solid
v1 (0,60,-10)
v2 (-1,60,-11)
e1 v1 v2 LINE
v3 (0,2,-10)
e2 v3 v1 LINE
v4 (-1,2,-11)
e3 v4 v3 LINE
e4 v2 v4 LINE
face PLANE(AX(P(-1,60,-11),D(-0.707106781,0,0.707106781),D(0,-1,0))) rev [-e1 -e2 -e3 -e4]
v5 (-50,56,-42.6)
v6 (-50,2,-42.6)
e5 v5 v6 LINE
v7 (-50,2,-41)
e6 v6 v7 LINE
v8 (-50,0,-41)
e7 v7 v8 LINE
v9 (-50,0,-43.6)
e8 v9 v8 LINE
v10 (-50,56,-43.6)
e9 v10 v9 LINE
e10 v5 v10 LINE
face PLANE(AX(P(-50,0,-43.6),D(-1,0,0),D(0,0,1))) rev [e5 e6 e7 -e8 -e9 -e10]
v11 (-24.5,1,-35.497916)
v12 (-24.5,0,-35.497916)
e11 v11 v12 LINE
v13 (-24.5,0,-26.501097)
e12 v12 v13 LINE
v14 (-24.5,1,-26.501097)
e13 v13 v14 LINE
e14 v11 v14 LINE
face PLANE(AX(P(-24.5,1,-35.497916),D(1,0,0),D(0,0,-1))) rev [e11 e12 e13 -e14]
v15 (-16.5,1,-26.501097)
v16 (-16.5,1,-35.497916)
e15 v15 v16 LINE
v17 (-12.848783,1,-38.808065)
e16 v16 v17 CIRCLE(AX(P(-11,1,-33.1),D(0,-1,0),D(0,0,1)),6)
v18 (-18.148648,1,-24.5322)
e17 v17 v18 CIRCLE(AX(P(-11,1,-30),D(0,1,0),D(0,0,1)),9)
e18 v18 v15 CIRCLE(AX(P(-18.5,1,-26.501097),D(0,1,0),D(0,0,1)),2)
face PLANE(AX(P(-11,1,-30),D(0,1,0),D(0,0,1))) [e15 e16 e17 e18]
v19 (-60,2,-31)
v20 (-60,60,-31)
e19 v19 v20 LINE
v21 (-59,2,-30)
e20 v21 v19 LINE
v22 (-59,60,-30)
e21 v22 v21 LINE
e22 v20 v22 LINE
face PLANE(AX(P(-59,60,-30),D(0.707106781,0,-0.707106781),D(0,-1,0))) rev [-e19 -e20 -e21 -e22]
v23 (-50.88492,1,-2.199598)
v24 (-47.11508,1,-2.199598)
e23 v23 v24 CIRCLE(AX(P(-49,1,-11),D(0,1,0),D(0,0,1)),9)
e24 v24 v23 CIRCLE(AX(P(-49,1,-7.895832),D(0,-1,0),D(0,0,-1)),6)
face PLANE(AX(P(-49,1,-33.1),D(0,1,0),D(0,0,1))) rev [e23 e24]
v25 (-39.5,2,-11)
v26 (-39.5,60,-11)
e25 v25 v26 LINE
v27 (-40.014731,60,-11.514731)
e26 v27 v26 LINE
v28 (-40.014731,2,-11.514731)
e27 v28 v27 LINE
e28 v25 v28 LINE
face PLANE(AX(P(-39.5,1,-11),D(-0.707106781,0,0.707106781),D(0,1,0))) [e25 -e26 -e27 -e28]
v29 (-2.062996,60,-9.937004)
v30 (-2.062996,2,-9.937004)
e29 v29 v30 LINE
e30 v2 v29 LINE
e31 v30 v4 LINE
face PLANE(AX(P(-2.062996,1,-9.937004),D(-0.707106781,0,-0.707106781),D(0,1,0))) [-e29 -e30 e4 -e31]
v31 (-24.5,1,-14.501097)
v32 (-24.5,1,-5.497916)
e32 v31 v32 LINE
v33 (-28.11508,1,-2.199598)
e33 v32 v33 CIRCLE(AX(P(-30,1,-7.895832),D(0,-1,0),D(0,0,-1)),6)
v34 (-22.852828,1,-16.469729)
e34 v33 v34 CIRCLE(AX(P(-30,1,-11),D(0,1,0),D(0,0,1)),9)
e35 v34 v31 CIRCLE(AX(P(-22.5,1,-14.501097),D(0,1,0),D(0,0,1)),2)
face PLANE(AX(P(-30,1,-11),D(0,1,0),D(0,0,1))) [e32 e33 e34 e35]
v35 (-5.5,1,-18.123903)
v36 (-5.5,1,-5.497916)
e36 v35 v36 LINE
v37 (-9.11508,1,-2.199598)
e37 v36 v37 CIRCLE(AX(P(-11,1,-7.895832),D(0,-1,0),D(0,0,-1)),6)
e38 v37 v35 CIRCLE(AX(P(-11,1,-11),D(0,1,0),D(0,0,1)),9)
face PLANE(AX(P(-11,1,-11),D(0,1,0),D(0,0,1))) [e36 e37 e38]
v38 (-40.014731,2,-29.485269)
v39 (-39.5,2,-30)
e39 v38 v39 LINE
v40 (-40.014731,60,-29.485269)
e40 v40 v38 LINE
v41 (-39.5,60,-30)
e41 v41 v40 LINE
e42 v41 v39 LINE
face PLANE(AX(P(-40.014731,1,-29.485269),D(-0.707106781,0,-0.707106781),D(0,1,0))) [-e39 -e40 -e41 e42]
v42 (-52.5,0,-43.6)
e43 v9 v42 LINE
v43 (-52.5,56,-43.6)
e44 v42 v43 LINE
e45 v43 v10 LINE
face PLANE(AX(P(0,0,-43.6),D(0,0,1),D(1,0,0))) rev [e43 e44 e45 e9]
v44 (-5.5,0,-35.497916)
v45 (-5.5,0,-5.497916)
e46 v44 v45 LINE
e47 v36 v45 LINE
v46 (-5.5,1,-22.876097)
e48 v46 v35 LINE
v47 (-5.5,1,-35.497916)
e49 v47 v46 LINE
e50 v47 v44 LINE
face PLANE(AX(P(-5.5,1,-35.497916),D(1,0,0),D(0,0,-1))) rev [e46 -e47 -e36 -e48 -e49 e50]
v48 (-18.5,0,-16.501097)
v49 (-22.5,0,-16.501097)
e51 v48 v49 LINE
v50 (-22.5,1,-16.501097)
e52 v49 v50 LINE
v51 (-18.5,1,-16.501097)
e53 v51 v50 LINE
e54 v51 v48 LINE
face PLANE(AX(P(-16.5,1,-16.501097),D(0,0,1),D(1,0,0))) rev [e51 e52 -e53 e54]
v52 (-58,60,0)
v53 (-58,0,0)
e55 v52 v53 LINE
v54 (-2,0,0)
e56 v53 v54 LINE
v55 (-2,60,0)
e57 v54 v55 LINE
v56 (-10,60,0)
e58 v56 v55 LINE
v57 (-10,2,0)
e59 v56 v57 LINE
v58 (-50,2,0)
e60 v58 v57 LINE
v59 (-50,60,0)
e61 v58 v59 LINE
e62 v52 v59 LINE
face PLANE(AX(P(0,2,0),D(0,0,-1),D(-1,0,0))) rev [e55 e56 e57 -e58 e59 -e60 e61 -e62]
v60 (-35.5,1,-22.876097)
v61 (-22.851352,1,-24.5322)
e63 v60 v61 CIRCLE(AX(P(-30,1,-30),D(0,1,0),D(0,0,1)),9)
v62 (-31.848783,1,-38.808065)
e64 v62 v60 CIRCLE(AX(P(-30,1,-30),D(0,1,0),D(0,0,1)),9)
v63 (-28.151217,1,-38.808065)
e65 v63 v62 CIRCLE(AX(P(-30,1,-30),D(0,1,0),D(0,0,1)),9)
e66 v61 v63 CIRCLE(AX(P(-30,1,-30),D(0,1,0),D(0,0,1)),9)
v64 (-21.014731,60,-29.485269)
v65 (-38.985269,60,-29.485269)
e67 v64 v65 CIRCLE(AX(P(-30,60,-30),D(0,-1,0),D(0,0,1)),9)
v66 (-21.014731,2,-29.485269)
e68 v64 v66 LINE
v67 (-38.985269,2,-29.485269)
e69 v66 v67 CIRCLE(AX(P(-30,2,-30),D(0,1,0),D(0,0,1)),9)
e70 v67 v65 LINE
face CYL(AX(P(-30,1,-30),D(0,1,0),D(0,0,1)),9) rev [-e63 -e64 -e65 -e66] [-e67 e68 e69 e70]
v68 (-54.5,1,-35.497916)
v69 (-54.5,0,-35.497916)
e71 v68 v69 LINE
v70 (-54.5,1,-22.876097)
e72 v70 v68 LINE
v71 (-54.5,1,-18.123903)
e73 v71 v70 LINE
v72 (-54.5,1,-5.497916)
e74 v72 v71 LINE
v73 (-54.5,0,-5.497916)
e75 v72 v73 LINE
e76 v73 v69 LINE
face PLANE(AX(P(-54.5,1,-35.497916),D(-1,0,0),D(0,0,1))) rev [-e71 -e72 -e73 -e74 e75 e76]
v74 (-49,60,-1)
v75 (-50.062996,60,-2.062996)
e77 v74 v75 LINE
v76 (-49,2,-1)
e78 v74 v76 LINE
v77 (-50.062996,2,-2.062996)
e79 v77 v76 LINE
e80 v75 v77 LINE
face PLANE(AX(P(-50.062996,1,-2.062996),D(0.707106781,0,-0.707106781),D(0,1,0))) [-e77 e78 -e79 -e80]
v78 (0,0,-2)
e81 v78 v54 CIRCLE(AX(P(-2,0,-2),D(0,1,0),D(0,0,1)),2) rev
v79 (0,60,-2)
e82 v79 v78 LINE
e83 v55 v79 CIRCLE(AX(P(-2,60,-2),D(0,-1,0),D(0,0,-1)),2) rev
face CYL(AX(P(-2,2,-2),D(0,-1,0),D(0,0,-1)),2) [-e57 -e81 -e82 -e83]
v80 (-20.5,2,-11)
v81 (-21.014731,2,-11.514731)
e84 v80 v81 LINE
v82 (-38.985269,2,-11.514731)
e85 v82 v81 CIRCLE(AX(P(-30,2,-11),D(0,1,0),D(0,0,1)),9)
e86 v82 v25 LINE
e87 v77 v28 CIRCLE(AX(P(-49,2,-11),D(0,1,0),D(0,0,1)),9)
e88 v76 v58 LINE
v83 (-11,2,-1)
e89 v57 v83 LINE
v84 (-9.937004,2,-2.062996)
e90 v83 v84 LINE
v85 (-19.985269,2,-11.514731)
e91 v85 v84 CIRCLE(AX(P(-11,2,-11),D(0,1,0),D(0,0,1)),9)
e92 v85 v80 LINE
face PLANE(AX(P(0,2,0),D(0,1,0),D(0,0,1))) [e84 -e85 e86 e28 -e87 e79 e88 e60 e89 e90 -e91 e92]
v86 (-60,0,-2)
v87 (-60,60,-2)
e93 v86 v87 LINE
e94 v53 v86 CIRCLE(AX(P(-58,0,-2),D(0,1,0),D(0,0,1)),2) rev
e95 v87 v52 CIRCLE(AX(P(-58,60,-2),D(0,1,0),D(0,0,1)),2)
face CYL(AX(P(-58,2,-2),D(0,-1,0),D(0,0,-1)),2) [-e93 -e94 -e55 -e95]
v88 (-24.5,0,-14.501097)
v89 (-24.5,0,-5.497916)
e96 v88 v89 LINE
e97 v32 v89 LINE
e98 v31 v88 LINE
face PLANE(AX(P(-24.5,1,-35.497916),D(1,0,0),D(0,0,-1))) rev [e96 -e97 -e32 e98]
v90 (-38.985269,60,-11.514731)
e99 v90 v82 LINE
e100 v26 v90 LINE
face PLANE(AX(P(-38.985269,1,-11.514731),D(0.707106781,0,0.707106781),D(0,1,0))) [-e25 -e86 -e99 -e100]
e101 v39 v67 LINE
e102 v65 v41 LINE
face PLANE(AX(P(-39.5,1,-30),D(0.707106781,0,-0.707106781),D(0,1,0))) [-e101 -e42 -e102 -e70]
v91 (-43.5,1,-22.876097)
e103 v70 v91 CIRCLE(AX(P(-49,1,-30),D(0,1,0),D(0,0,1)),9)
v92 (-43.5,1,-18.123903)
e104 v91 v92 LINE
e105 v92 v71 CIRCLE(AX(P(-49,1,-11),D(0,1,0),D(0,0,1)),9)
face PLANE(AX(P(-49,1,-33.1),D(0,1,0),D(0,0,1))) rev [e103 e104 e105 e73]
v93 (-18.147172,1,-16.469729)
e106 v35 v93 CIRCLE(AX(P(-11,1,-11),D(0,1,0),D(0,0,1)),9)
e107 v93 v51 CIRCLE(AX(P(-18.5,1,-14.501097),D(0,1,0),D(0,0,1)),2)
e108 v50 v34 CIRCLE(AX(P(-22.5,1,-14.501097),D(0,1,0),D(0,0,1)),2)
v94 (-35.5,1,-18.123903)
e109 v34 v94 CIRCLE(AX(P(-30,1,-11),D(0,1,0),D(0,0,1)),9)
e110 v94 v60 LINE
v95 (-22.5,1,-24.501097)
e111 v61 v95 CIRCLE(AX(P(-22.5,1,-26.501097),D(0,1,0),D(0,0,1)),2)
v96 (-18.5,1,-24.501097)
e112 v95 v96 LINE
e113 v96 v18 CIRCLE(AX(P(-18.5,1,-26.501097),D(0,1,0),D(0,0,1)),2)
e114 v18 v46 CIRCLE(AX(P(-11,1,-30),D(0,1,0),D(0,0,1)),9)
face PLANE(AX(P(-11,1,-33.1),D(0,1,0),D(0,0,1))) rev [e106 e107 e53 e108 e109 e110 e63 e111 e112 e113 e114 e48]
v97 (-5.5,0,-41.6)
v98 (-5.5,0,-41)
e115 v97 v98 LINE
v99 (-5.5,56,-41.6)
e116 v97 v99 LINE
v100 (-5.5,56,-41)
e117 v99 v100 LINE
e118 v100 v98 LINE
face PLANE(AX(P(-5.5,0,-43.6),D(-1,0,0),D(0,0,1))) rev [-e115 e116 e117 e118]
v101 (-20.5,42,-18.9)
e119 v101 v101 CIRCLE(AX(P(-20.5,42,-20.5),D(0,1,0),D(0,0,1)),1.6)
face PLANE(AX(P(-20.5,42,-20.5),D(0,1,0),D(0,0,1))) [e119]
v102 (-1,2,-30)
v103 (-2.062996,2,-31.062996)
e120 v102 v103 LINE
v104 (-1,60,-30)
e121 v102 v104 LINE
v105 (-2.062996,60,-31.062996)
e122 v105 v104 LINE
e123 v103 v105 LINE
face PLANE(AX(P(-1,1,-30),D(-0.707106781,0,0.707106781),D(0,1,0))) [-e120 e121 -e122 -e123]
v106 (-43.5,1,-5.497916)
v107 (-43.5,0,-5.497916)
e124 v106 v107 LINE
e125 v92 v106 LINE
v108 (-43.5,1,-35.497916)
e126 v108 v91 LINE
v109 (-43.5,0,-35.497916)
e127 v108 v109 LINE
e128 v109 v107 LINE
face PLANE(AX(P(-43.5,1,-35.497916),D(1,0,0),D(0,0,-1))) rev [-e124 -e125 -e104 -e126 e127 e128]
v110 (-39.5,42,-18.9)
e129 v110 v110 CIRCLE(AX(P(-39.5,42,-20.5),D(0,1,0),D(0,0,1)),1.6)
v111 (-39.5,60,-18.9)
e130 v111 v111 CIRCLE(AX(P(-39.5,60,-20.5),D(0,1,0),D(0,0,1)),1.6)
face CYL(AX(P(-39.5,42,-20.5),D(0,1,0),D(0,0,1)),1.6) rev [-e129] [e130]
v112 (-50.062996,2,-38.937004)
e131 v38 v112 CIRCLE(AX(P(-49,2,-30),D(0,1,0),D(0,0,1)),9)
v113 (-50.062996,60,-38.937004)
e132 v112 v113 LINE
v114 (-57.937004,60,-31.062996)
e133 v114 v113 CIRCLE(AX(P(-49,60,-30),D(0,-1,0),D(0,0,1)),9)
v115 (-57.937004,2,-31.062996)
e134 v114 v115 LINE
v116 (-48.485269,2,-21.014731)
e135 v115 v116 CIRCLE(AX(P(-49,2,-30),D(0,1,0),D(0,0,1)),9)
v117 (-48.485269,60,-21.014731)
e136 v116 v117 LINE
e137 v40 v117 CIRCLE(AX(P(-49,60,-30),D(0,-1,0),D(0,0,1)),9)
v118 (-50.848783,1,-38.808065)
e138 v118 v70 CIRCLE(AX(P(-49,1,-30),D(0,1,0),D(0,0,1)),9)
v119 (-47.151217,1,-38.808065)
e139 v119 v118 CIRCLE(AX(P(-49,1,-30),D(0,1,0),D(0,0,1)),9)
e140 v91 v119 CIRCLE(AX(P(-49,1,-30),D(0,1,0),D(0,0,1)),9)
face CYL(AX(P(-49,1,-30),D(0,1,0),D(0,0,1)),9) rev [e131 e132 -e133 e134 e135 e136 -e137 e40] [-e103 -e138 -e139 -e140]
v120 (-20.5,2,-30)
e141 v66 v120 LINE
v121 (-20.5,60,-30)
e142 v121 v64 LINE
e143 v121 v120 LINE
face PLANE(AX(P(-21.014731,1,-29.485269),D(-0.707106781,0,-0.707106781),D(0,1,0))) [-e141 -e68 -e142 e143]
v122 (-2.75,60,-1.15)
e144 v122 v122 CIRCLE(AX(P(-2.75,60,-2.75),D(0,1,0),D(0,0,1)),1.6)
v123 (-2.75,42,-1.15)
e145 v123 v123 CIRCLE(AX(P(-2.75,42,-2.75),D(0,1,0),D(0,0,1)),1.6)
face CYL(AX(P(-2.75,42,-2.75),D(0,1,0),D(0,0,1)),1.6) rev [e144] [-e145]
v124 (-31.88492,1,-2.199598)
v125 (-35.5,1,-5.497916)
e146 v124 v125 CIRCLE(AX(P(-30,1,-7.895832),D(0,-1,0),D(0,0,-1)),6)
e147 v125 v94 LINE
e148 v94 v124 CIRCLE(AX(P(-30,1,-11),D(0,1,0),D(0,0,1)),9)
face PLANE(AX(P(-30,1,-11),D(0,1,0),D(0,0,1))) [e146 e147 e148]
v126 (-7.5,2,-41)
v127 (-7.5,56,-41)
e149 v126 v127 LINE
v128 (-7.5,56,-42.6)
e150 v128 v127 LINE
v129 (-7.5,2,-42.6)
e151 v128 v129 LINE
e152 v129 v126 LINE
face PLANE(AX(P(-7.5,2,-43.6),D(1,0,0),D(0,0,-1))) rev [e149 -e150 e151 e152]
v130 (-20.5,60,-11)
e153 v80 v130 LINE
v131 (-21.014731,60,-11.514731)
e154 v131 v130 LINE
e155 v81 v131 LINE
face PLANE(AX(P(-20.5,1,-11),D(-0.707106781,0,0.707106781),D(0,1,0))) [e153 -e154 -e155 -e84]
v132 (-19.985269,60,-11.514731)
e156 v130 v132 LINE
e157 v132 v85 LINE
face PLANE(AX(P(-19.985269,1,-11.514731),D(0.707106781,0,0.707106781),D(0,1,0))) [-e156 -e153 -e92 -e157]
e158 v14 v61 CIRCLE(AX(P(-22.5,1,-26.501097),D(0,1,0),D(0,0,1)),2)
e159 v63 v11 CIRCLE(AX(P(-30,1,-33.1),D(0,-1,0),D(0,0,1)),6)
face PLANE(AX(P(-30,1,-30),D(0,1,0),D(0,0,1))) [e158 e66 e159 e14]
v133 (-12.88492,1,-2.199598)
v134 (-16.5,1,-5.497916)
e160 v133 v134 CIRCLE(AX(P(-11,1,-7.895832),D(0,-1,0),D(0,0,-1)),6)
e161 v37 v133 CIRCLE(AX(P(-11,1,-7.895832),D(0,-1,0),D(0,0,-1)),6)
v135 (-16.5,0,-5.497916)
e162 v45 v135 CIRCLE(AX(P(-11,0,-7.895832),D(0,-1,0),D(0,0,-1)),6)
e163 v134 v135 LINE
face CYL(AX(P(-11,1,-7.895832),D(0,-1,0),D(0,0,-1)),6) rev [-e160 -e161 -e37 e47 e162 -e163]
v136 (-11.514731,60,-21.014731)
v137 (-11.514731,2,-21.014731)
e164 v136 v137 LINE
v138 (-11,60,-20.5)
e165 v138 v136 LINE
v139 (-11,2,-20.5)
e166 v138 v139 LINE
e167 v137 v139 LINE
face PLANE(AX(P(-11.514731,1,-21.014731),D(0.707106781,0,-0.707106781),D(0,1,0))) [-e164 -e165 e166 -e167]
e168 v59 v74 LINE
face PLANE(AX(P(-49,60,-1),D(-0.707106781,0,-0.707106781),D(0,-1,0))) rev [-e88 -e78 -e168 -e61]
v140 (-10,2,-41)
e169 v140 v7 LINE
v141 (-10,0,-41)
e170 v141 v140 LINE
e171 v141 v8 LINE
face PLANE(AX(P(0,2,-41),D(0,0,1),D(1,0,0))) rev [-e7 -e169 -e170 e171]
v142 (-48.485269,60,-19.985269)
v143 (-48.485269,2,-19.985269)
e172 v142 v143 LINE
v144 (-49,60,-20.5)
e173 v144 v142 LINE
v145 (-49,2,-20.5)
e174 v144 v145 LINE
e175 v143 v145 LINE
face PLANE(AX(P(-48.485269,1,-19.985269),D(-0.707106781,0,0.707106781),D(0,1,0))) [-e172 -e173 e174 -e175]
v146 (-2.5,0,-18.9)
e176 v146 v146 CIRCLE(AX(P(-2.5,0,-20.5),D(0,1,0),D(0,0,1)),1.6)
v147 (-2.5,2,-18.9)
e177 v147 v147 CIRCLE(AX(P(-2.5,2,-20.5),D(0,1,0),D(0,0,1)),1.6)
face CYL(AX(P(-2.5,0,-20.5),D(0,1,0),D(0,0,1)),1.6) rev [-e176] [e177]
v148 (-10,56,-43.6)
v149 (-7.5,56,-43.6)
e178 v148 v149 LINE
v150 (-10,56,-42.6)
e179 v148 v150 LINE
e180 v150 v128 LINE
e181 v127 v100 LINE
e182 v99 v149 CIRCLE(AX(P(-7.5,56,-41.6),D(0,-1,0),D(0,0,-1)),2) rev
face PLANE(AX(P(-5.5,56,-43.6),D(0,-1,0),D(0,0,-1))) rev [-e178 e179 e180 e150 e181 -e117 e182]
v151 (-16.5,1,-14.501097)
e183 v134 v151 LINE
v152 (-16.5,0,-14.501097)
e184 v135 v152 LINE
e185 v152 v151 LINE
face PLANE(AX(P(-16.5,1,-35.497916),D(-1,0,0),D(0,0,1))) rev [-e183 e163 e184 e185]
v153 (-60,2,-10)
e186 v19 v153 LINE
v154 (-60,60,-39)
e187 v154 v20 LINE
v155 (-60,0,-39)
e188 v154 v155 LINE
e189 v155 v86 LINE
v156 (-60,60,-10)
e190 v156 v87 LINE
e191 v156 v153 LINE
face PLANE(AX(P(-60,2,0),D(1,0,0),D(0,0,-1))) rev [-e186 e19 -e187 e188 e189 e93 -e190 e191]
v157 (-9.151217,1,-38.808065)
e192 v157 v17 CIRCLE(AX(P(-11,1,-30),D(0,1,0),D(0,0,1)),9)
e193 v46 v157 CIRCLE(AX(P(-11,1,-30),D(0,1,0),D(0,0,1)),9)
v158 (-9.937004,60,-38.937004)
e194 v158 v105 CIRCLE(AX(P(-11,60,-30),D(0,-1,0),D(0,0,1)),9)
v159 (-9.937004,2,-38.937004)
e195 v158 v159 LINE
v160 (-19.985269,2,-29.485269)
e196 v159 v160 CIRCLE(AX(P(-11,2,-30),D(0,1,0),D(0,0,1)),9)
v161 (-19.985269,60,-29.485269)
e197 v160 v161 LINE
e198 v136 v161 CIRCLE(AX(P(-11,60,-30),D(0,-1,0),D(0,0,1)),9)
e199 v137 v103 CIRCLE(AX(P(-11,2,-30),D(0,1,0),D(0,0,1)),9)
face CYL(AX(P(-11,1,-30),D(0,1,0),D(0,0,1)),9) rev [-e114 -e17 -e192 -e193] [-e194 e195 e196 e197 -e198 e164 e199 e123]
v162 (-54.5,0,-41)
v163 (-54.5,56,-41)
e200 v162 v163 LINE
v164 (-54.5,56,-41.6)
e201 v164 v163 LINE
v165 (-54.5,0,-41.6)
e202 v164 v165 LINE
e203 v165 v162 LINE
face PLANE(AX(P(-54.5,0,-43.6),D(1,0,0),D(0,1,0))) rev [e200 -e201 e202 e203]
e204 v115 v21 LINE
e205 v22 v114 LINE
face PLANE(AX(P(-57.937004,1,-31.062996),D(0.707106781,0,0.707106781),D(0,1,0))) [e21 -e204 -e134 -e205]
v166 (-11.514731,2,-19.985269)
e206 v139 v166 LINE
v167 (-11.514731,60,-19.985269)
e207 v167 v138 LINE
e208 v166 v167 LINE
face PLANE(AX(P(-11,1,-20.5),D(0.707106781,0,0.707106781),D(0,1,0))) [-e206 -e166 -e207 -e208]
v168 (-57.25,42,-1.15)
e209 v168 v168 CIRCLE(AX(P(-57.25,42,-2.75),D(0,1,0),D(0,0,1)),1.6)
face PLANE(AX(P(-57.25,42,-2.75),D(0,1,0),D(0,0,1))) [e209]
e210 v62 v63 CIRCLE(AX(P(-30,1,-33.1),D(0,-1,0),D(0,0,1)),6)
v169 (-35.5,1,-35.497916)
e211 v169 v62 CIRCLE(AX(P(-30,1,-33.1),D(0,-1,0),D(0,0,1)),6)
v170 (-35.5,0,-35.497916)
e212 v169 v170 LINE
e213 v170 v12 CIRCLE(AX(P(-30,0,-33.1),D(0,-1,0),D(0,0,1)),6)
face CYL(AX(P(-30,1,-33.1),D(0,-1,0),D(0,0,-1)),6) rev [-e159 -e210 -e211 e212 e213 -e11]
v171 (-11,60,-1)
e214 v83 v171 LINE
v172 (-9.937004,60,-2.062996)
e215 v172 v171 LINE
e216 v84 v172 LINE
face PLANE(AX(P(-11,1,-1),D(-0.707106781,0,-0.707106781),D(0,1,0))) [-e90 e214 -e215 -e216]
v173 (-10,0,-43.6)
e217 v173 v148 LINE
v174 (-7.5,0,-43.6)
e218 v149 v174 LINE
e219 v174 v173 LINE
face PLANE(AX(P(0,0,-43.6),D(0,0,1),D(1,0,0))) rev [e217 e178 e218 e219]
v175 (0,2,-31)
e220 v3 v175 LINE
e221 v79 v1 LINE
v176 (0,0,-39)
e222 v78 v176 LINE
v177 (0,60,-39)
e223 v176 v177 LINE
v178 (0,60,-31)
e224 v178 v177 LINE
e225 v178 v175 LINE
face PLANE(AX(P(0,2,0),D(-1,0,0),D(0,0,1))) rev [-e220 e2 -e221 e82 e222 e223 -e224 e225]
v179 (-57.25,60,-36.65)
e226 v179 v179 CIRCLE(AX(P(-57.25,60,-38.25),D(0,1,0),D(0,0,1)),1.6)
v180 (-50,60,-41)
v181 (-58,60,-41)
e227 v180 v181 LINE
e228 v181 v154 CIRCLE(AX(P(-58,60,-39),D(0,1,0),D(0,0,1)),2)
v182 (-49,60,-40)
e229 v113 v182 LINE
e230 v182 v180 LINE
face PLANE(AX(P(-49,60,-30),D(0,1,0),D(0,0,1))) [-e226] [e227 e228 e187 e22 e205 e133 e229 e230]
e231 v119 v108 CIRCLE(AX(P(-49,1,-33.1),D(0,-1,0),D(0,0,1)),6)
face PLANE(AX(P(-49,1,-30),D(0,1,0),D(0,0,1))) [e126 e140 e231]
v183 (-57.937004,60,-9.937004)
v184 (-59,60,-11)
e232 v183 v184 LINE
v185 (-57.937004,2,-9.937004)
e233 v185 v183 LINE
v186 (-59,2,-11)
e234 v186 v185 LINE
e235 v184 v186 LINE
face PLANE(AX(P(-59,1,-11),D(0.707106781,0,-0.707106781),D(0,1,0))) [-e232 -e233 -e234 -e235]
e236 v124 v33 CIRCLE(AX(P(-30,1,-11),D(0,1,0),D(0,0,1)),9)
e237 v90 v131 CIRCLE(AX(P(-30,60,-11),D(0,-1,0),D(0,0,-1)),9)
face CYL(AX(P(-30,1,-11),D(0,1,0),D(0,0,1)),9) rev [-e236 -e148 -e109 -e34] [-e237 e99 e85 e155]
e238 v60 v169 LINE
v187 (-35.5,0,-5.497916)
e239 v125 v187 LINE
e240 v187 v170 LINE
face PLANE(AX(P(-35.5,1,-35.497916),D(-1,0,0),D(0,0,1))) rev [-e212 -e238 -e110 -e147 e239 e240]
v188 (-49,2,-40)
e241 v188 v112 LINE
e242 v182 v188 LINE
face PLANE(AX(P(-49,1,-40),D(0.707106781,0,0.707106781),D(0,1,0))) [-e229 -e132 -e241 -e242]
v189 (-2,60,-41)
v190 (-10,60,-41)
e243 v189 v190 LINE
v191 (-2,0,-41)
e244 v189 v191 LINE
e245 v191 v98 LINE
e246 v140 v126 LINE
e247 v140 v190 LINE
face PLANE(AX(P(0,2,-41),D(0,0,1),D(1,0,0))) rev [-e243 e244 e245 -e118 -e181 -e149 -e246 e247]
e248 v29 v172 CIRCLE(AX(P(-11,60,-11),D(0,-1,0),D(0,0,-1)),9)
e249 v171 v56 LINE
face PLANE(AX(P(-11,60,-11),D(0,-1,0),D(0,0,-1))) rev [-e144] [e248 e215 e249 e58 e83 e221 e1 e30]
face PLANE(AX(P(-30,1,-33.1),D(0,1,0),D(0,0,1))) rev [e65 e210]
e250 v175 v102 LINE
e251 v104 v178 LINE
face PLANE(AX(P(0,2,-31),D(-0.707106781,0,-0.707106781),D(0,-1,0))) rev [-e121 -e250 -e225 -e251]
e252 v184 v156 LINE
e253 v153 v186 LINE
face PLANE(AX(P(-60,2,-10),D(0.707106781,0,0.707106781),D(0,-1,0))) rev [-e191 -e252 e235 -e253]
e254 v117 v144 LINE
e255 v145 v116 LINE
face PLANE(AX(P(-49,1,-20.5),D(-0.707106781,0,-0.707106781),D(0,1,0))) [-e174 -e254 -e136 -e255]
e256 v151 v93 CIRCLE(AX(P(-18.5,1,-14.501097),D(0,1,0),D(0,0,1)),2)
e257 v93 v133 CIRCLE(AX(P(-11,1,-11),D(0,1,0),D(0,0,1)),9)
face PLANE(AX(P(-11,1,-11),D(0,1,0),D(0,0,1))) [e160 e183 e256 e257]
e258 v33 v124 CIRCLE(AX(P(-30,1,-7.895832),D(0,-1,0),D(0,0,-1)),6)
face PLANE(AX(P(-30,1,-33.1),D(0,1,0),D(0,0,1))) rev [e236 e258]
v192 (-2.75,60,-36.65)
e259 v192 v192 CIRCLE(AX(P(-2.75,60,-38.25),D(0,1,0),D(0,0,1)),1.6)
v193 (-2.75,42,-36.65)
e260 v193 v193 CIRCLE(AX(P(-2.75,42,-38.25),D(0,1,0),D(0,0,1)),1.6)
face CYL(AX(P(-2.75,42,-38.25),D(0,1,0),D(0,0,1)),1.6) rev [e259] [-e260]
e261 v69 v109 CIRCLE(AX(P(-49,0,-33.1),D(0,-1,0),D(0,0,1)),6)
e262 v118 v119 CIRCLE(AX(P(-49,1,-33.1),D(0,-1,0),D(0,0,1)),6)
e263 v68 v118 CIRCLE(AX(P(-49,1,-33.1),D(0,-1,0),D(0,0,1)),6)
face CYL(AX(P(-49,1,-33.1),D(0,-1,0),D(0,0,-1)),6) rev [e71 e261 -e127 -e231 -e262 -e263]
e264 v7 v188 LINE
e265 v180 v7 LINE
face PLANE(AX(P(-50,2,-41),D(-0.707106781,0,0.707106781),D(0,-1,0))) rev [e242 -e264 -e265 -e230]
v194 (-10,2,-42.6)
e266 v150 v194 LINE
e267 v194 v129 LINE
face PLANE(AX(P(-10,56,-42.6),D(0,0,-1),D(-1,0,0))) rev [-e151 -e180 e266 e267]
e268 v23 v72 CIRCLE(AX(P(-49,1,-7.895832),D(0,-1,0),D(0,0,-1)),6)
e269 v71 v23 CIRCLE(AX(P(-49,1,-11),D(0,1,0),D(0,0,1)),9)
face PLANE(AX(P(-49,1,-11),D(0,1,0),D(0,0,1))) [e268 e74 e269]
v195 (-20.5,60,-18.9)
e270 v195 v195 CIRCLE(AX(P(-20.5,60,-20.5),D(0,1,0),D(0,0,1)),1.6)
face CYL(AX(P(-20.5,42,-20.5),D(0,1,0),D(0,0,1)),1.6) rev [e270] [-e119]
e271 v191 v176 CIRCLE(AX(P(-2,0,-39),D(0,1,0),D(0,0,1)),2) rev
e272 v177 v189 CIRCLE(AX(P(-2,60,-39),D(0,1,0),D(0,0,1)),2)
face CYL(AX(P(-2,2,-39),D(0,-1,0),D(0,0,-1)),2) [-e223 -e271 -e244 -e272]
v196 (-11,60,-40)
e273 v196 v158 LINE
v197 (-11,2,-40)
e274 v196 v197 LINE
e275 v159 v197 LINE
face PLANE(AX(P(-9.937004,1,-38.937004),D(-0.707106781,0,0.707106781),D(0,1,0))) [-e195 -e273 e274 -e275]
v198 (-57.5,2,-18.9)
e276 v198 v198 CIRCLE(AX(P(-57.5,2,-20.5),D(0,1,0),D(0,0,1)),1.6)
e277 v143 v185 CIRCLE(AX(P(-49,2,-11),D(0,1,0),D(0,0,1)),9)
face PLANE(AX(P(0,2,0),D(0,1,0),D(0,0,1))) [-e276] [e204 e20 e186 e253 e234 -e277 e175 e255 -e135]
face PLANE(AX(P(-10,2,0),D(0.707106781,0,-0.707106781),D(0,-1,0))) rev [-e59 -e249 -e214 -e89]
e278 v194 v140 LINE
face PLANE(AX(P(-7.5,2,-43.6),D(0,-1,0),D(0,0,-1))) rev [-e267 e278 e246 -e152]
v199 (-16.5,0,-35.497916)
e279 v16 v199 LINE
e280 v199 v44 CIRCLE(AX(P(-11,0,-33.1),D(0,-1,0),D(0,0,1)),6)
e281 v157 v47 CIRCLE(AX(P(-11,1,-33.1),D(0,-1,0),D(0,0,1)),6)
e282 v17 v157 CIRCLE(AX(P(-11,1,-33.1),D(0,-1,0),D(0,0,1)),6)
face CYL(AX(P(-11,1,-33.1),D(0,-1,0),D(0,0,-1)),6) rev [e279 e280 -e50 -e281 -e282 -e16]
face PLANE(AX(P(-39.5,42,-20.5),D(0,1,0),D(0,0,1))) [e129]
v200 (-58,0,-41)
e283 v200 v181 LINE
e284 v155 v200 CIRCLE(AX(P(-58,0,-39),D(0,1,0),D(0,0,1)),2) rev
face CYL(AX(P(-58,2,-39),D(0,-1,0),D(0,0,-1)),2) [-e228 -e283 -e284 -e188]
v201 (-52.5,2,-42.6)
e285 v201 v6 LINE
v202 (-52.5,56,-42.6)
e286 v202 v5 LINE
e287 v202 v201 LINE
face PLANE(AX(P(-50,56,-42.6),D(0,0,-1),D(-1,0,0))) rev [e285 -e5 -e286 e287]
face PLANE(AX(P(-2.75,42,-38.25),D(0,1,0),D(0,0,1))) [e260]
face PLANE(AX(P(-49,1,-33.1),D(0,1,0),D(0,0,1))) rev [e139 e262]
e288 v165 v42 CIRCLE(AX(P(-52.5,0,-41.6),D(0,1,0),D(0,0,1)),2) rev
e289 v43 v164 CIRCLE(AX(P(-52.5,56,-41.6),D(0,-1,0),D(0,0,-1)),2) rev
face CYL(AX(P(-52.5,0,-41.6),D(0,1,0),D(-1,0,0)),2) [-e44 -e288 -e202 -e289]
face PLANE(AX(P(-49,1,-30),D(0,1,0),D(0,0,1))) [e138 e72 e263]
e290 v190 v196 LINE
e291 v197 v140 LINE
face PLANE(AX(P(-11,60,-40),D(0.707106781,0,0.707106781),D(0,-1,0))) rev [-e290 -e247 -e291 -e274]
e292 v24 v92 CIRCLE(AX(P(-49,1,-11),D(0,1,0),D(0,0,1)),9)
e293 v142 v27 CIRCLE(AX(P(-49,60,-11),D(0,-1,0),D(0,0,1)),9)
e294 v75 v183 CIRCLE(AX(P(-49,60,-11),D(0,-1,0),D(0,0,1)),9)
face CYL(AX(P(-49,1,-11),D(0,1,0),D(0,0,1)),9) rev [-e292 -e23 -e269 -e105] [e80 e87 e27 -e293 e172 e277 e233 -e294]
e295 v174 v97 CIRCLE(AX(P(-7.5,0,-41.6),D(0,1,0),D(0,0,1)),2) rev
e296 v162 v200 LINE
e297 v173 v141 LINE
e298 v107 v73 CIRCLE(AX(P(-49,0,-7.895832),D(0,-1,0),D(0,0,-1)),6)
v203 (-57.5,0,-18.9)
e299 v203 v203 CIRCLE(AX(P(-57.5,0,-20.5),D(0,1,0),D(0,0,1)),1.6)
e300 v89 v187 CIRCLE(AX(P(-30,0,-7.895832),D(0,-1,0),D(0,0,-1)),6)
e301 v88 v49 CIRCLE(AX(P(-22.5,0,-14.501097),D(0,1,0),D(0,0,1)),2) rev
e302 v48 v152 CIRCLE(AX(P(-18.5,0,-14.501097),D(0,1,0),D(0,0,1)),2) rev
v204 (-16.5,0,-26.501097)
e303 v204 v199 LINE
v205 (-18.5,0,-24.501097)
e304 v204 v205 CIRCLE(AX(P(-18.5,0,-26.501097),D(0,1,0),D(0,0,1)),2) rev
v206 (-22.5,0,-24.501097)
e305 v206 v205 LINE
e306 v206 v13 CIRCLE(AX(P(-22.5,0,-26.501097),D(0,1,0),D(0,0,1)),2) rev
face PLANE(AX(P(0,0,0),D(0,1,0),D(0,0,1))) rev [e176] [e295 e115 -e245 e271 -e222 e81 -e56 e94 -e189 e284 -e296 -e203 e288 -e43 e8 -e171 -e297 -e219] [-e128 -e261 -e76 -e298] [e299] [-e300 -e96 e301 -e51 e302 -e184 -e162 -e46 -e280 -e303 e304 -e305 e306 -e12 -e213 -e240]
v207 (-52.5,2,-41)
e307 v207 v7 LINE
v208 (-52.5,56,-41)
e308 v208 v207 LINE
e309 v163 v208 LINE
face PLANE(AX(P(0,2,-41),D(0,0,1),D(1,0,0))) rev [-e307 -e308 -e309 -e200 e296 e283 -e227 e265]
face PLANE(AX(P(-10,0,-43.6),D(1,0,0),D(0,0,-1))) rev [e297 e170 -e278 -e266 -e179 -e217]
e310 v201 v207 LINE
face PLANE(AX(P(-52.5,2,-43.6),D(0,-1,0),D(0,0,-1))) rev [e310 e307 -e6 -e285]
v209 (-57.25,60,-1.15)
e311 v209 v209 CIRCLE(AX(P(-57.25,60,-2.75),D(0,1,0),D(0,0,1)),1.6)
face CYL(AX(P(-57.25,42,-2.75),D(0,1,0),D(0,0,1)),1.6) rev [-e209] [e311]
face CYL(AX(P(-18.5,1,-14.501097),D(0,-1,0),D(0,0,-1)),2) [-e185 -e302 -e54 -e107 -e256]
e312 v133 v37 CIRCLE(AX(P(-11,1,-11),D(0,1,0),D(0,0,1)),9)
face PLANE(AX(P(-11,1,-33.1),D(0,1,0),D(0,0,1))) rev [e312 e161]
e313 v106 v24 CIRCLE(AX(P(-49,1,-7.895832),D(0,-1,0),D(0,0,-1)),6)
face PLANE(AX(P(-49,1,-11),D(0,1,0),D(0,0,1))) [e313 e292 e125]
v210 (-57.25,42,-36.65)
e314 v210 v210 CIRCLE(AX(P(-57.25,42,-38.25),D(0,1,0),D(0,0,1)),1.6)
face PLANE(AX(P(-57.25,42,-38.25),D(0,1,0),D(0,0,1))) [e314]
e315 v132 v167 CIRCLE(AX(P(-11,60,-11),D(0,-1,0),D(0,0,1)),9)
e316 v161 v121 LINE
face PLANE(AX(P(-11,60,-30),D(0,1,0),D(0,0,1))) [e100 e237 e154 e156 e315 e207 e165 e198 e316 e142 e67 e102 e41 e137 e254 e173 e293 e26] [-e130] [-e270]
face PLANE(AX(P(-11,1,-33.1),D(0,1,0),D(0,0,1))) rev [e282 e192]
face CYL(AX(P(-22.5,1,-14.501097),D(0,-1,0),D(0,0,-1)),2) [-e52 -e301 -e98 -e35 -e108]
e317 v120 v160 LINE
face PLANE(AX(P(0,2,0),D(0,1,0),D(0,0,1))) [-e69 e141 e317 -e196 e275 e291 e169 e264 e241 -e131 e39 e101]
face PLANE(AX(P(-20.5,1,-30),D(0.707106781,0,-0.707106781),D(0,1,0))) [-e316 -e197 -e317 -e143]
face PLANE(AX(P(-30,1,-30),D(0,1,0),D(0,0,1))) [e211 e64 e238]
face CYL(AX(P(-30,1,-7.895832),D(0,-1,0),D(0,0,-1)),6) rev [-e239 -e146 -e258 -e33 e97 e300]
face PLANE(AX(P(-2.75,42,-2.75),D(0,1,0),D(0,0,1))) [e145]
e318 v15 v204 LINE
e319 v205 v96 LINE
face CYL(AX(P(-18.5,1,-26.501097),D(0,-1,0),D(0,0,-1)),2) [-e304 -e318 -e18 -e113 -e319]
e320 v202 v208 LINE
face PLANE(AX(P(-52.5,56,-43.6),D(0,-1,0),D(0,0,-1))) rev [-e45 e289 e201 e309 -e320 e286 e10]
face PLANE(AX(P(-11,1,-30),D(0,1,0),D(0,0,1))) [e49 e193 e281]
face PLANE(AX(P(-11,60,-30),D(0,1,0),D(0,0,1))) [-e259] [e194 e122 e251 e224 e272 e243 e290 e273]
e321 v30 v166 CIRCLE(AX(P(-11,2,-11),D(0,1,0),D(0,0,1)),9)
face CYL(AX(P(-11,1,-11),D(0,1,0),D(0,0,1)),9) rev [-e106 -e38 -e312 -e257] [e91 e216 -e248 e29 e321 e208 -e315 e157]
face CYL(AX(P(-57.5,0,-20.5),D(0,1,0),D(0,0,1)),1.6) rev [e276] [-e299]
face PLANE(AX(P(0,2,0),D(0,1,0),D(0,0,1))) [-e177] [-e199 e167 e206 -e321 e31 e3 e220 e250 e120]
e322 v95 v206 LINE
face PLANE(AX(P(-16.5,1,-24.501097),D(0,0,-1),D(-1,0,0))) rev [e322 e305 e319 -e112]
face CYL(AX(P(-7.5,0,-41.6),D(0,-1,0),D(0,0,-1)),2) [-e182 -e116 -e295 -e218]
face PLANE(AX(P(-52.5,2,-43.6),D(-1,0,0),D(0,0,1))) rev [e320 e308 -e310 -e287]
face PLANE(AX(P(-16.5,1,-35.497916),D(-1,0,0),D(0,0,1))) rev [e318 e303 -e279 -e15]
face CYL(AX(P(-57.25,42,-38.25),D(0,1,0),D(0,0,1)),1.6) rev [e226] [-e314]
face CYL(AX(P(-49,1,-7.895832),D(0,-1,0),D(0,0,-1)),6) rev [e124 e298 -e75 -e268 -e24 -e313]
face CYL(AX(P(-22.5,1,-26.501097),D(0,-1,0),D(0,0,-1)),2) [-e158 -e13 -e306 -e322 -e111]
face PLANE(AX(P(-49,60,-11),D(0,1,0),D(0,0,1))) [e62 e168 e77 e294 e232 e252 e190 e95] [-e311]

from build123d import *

# Parameters (mm, degrees)
SKETCH1_W           = 60
SKETCH1_H           = 41
BOSS_EXTRUDE1_DEPTH = 2
SKETCH2_R           = 9
CUT_EXTRUDE2_DEPTH  = 1
CUT_EXTRUDE3_DEPTH  = 1
SKETCH4_W           = 8
SKETCH4_H           = 8
CUT_EXTRUDE4_DEPTH  = 1
BOSS_EXTRUDE2_START = 58
BOSS_EXTRUDE2_DEPTH = 58
SKETCH6_R           = 1.6
CUT_EXTRUDE5_DEPTH  = 18
CHAMFER2_SIZE       = 0.5
CHAMFER3_SIZE       = 1
SKETCH7_R           = 1.6
CUT_EXTRUDE6_DEPTH  = 93.978492137
FILLET1_R           = 2
BOSS_EXTRUDE3_DEPTH = 2.6
SKETCH11_W          = 2.5
SKETCH11_H          = 1
BOSS_EXTRUDE4_DEPTH = 54
FILLET2_R           = 2


with BuildPart() as part:
    # Sketch1 → Boss-Extrude1 (new body)
    with BuildSketch(Plane(origin=(0, 0, 0), x_dir=(1, 0, 0), z_dir=(0, 1, 0))):
        with Locations((-30, 20.5)):
            Rectangle(SKETCH1_W, SKETCH1_H)
    extrude(amount=BOSS_EXTRUDE1_DEPTH)

    # Sketch2 → Cut-Extrude2 (cut)
    with BuildSketch(Plane(origin=(0, 2, 0), x_dir=(1, 0, 0), z_dir=(0, 1, 0))):
        with Locations(Location((-49, 11, 0), (0, 0, 270))):
            Circle(SKETCH2_R)
        with Locations(Location((-30, 11, 0), (0, 0, 270))):
            Circle(SKETCH2_R)
        with Locations(Location((-11, 11, 0), (0, 0, 270))):
            Circle(SKETCH2_R)
        with Locations(Location((-30, 30, 0), (0, 0, 270))):
            Circle(SKETCH2_R)
        with Locations(Location((-11, 30, 0), (0, 0, 270))):
            Circle(SKETCH2_R)
        with Locations(Location((-49, 30, 0), (0, 0, 270))):
            Circle(SKETCH2_R)
    extrude(amount=-CUT_EXTRUDE2_DEPTH, mode=Mode.SUBTRACT)

    # Sketch3 → Cut-Extrude3 (cut)
    with BuildSketch(Plane.XZ):
        with BuildLine():
            Line((-5.5, -35.497915762), (-5.5, -5.497915762))
            ThreePointArc((-5.5, -5.497915762), (-11, -1.895831523), (-16.5, -5.497915762))
            Line((-16.5, -5.497915762), (-16.5, -35.497915762))
            ThreePointArc((-16.5, -35.497915762), (-11, -39.1), (-5.5, -35.497915762))
        make_face()
        with BuildLine():
            Line((-35.5, -35.497915762), (-35.5, -5.497915762))
            ThreePointArc((-35.5, -5.497915762), (-30, -1.895831523), (-24.5, -5.497915762))
            Line((-24.5, -5.497915762), (-24.5, -35.497915762))
            ThreePointArc((-24.5, -35.497915762), (-30, -39.1), (-35.5, -35.497915762))
        make_face()
        with BuildLine():
            Line((-54.5, -35.497915762), (-54.5, -5.497915762))
            ThreePointArc((-54.5, -5.497915762), (-49, -1.895831523), (-43.5, -5.497915762))
            Line((-43.5, -5.497915762), (-43.5, -35.497915762))
            ThreePointArc((-43.5, -35.497915762), (-49, -39.1), (-54.5, -35.497915762))
        make_face()
    extrude(amount=-CUT_EXTRUDE3_DEPTH, mode=Mode.SUBTRACT)

    # Sketch4 → Cut-Extrude4 (cut)
    with BuildSketch(Plane.XZ):
        with Locations((-20.5, -20.501096576)):
            Rectangle(SKETCH4_W, SKETCH4_H)
    extrude(amount=-CUT_EXTRUDE4_DEPTH, mode=Mode.SUBTRACT)

    # Sketch5 → Boss-Extrude2 (add)
    with BuildSketch(Plane(origin=(0, 2, 0), x_dir=(1, 0, 0), z_dir=(0, 1, 0)).offset(BOSS_EXTRUDE2_START)):
        with BuildLine():
            Line((-20, 30), (-21, 30))
            ThreePointArc((-21, 30), (-23.636038969, 23.636038969), (-30, 21))
            ThreePointArc((-30, 21), (-36.363961031, 23.636038969), (-39, 30))
            Line((-39, 30), (-40, 30))
            ThreePointArc((-40, 30), (-42.636038969, 23.636038969), (-49, 21))
            Line((-49, 21), (-49, 20))
            ThreePointArc((-49, 20), (-42.636038969, 17.363961031), (-40, 11))
            Line((-40, 11), (-39, 11))
            ThreePointArc((-39, 11), (-36.363961031, 17.363961031), (-30, 20))
            ThreePointArc((-30, 20), (-23.636038969, 17.363961031), (-21, 11))
            Line((-21, 11), (-20, 11))
            ThreePointArc((-20, 11), (-17.363961031, 17.363961031), (-11, 20))
            Line((-11, 20), (-11, 21))
            ThreePointArc((-11, 21), (-17.363961031, 23.636038969), (-20, 30))
        make_face()
        with BuildLine():
            Line((-58, 30), (-60, 30))
            Line((-60, 30), (-60, 41))
            Line((-60, 41), (-49, 41))
            Line((-49, 41), (-49, 39))
            ThreePointArc((-49, 39), (-55.363961031, 36.363961031), (-58, 30))
        make_face()
        with BuildLine():
            Line((-58, 11), (-60, 11))
            Line((-60, 11), (-60, 0))
            Line((-60, 0), (-49, 0))
            Line((-49, 0), (-49, 2))
            ThreePointArc((-49, 2), (-55.363961031, 4.636038969), (-58, 11))
        make_face()
        with BuildLine():
            Line((-2, 11), (0, 11))
            Line((0, 11), (0, 0))
            Line((0, 0), (-11, 0))
            Line((-11, 0), (-11, 2))
            ThreePointArc((-11, 2), (-4.636038969, 4.636038969), (-2, 11))
        make_face()
        with BuildLine():
            Line((-2, 30), (0, 30))
            Line((0, 30), (0, 41))
            Line((0, 41), (-11, 41))
            Line((-11, 41), (-11, 39))
            ThreePointArc((-11, 39), (-4.636038969, 36.363961031), (-2, 30))
        make_face()
    extrude(amount=-BOSS_EXTRUDE2_DEPTH)

    # Sketch6 → Cut-Extrude5 (cut)
    with BuildSketch(Plane(origin=(0, 60, 0), x_dir=(1, 0, 0), z_dir=(0, 1, 0))):
        with Locations(Location((-20.5, 20.5, 0), (0, 0, 270))):
            Circle(SKETCH6_R)
        with Locations(Location((-39.5, 20.5, 0), (0, 0, 270))):
            Circle(SKETCH6_R)
        with Locations(Location((-57.25, 2.75, 0), (0, 0, 270))):
            Circle(SKETCH6_R)
        with Locations(Location((-57.25, 38.25, 0), (0, 0, 270))):
            Circle(SKETCH6_R)
        with Locations(Location((-2.75, 2.75, 0), (0, 0, 270))):
            Circle(SKETCH6_R)
        with Locations(Location((-2.75, 38.25, 0), (0, 0, 270))):
            Circle(SKETCH6_R)
    extrude(amount=-CUT_EXTRUDE5_DEPTH, mode=Mode.SUBTRACT)

    # Chamfer2
    # the kernel refuses this chamfer: 0.5 mm, written as the material it takes off along each edge
    with BuildSketch(Plane(origin=(-40, 61.324152825, -11), x_dir=(1, 0, 0), z_dir=(0, -1, 0)), Plane(origin=(-21, 61.324152825, -11), x_dir=(1, 0, 0), z_dir=(0, -1, 0)), Plane(origin=(-49, 61.324152825, -21), x_dir=(0, 0, 1), z_dir=(0, -1, 0)), Plane(origin=(-39, 61.324152825, -30), x_dir=(-1, 0, 0), z_dir=(0, -1, 0)), Plane(origin=(-20, 61.324152825, -30), x_dir=(-1, 0, 0), z_dir=(0, -1, 0)), Plane(origin=(-11, 61.324152825, -20), x_dir=(0, 0, -1), z_dir=(0, -1, 0))) as chamfer2_piece_1:
        with BuildLine():
            Line((CHAMFER2_SIZE, 0), (-0.014731413, -0.514731413))
            ThreePointArc((-0.014731413, -0.514731413), (-0.003894786, -0.264747015), (0, 0))
            Line((0, 0), (CHAMFER2_SIZE, 0))
        make_face()
    extrude(amount=59.324152825, mode=Mode.SUBTRACT)
    with BuildSketch(Plane(origin=(-39, 61.324152825, -11), x_dir=(-1, 0, 0), z_dir=(0, -1, 0)), Plane(origin=(-20, 61.324152825, -11), x_dir=(-1, 0, 0), z_dir=(0, -1, 0)), Plane(origin=(-40, 61.324152825, -30), x_dir=(1, 0, 0), z_dir=(0, -1, 0)), Plane(origin=(-21, 61.324152825, -30), x_dir=(1, 0, 0), z_dir=(0, -1, 0)), Plane(origin=(-11, 61.324152825, -21), x_dir=(0, 0, 1), z_dir=(0, -1, 0))) as chamfer2_piece_2:
        with BuildLine():
            Line((CHAMFER2_SIZE, 0), (-0.014731413, 0.514731413))
            ThreePointArc((-0.014731413, 0.514731413), (-0.003894786, 0.264747015), (0, 0))
            Line((0, 0), (CHAMFER2_SIZE, 0))
        make_face()
    extrude(amount=59.324152825, mode=Mode.SUBTRACT)
    with BuildSketch(Plane(origin=(-49, 61.324152825, -20), x_dir=(0.999590710311118, 0, 0.02860789855467639), z_dir=(0, -1, 0))) as chamfer2_piece_3:
        with BuildLine():
            Line((0.514942174, 0), (-CHAMFER2_SIZE * 0.0286078985547, -CHAMFER2_SIZE * 0.999590710311))
            Line((-CHAMFER2_SIZE * 0.0286078985547, -CHAMFER2_SIZE * 0.999590710311), (0, 0))
            ThreePointArc((0, 0), (0.264750079, -0.003680664), (0.514942174, 0))
        make_face()
    extrude(amount=59.324152825, mode=Mode.SUBTRACT)

    # Chamfer3
    # the kernel refuses this chamfer: 1 mm, written as the material it takes off along each edge
    with BuildSketch(Plane(origin=(-2, 62.73772815, -30), x_dir=(1, 0, 0), z_dir=(0, -1, 0)), Plane(origin=(-49, 62.73772815, -39), x_dir=(0, 0, -1), z_dir=(0, -1, 0)), Plane(origin=(-11, 62.73772815, -2), x_dir=(0, 0, 1), z_dir=(0, -1, 0))) as chamfer3_piece_1:
        with BuildLine():
            Line((CHAMFER3_SIZE, 0), (-0.062996063, -1.062996063))
            ThreePointArc((-0.062996063, -1.062996063), (-0.016662827, -0.547405922), (0, 0))
            Line((0, 0), (CHAMFER3_SIZE, 0))
        make_face()
    extrude(amount=60.73772815, mode=Mode.SUBTRACT)
    with BuildSketch(Plane(origin=(0, 62.571682988, -30), x_dir=(0, 0, -1), z_dir=(0, -1, 0)), Plane(origin=(-49, 62.571682988, -41), x_dir=(-1, 0, 0), z_dir=(0, -1, 0)), Plane(origin=(-60, 62.571682988, -11), x_dir=(0, 0, 1), z_dir=(0, -1, 0)), Plane(origin=(-11, 62.571682988, 0), x_dir=(1, 0, 0), z_dir=(0, -1, 0))) as chamfer3_piece_2:
        Polygon((CHAMFER3_SIZE, 0), (0, -CHAMFER3_SIZE), (0, 0), align=None)
    extrude(amount=60.571682988, mode=Mode.SUBTRACT)
    with BuildSketch(Plane(origin=(-11, 62.73772815, -39), x_dir=(0, 0, -1), z_dir=(0, -1, 0)), Plane(origin=(-58, 62.73772815, -30), x_dir=(-1, 0, 0), z_dir=(0, -1, 0)), Plane(origin=(-49, 62.73772815, -2), x_dir=(0, 0, 1), z_dir=(0, -1, 0)), Plane(origin=(-2, 62.73772815, -11), x_dir=(1, 0, 0), z_dir=(0, -1, 0))) as chamfer3_piece_3:
        with BuildLine():
            Line((CHAMFER3_SIZE, 0), (-0.062996063, 1.062996063))
            ThreePointArc((-0.062996063, 1.062996063), (-0.016662827, 0.547405922), (0, 0))
            Line((0, 0), (CHAMFER3_SIZE, 0))
        make_face()
    extrude(amount=60.73772815, mode=Mode.SUBTRACT)
    with BuildSketch(Plane(origin=(-11, 62.571682988, -41), x_dir=(1, 0, 0), z_dir=(0, -1, 0)), Plane(origin=(-60, 62.571682988, -30), x_dir=(0, 0, -1), z_dir=(0, -1, 0)), Plane(origin=(-49, 62.571682988, 0), x_dir=(-1, 0, 0), z_dir=(0, -1, 0)), Plane(origin=(0, 62.571682988, -11), x_dir=(0, 0, 1), z_dir=(0, -1, 0))) as chamfer3_piece_4:
        Polygon((CHAMFER3_SIZE, 0), (0, CHAMFER3_SIZE), (0, 0), align=None)
    extrude(amount=60.571682988, mode=Mode.SUBTRACT)
    with BuildSketch(Plane(origin=(-58, 62.73772815, -11), x_dir=(0.05915894925917608, 0, 0.9982485756175915), z_dir=(0, -1, 0))) as chamfer3_piece_5:
        with BuildLine():
            Line((1.064861087, 0), (-CHAMFER3_SIZE * 0.0591589492592, CHAMFER3_SIZE * 0.998248575618))
            Line((-CHAMFER3_SIZE * 0.0591589492592, CHAMFER3_SIZE * 0.998248575618), (0, 0))
            ThreePointArc((0, 0), (0.547432937, 0.015750315), (1.064861087, 0))
        make_face()
    extrude(amount=60.73772815, mode=Mode.SUBTRACT)

    # Sketch7 → Cut-Extrude6 (cut, through all)
    with BuildSketch(Plane(origin=(0, 2, 0), x_dir=(1, 0, 0), z_dir=(0, 1, 0))):
        with Locations(Location((-57.5, 20.5, 0), (0, 0, 270))):
            Circle(SKETCH7_R)
        with Locations(Location((-2.5, 20.5, 0), (0, 0, 270))):
            Circle(SKETCH7_R)
    extrude(amount=-CUT_EXTRUDE6_DEPTH, mode=Mode.SUBTRACT)

    # Fillet1
    # the kernel refuses this fillet: 2 mm, written as the material it takes off along each edge
    with BuildSketch(Plane(origin=(-16.5, -5, -16.501096576), x_dir=(0, 0, 1), z_dir=(0, 1, 0)), Plane(origin=(-24.5, -5, -16.501096576), x_dir=(1, 0, 0), z_dir=(0, 1, 0))) as fillet1_piece_1:
        with BuildLine():
            CenterArc((FILLET1_R, -FILLET1_R), FILLET1_R, 90, 90)
            Line((0, -FILLET1_R), (0, 0))
            Line((0, 0), (FILLET1_R, 0))
        make_face()
    extrude(amount=6, mode=Mode.SUBTRACT)
    with BuildSketch(Plane(origin=(-16.5, -5, -24.501096576), x_dir=(0, 0, -1), z_dir=(0, 1, 0)), Plane(origin=(-24.5, -5, -24.501096576), x_dir=(1, 0, 0), z_dir=(0, 1, 0))) as fillet1_piece_2:
        with BuildLine():
            CenterArc((FILLET1_R, FILLET1_R), FILLET1_R, 180, 90)
            Line((0, FILLET1_R), (0, 0))
            Line((0, 0), (FILLET1_R, 0))
        make_face()
    extrude(amount=6, mode=Mode.SUBTRACT)
    with BuildSketch(Plane(origin=(0, -5, 0), x_dir=(-1, 0, 0), z_dir=(0, 1, 0)), Plane(origin=(-60, 65, 0), x_dir=(1, 0, 0), z_dir=(0, -1, 0)), Plane(origin=(-60, 65, -41), x_dir=(0, 0, 1), z_dir=(0, -1, 0)), Plane(origin=(0, -5, -41), x_dir=(0, 0, 1), z_dir=(0, 1, 0))) as fillet1_piece_3:
        with BuildLine():
            CenterArc((FILLET1_R, -FILLET1_R), FILLET1_R, 90, 90)
            Line((0, -FILLET1_R), (0, 0))
            Line((0, 0), (FILLET1_R, 0))
        make_face()
    extrude(amount=70, mode=Mode.SUBTRACT)

    # Sketch9 → Boss-Extrude3 (add)
    with BuildSketch(Plane(origin=(0, 0, -41), x_dir=(-1, 0, 0), z_dir=(0, 0, -1))):
        Polygon((52.5, 0), (54.5, 0), (54.5, 56), (52.5, 56), (52.5, 2), (50, 2), (50, 0), align=None)
        Polygon((5.5, 0), (7.5, 0), (10, 0), (10, 2), (7.5, 2), (7.5, 56), (5.5, 56), align=None)
    extrude(amount=BOSS_EXTRUDE3_DEPTH)

    # Sketch11 → Boss-Extrude4 (add)
    with BuildSketch(Plane(origin=(0, 2, 0), x_dir=(1, 0, 0), z_dir=(0, 1, 0))):
        with Locations((-8.75, 43.1)):
            Rectangle(SKETCH11_W, SKETCH11_H)
        with Locations((-51.25, 43.1)):
            Rectangle(SKETCH11_W, SKETCH11_H)
    extrude(amount=BOSS_EXTRUDE4_DEPTH)

    # Fillet2
    fillet2_edges = [part.edges().sort_by_distance(p)[0] for p in [
        (-54.5, 28, -43.6),
        (-5.5, 28, -43.6),
    ]]
    fillet(fillet2_edges, radius=FILLET2_R)


solid = part.part
